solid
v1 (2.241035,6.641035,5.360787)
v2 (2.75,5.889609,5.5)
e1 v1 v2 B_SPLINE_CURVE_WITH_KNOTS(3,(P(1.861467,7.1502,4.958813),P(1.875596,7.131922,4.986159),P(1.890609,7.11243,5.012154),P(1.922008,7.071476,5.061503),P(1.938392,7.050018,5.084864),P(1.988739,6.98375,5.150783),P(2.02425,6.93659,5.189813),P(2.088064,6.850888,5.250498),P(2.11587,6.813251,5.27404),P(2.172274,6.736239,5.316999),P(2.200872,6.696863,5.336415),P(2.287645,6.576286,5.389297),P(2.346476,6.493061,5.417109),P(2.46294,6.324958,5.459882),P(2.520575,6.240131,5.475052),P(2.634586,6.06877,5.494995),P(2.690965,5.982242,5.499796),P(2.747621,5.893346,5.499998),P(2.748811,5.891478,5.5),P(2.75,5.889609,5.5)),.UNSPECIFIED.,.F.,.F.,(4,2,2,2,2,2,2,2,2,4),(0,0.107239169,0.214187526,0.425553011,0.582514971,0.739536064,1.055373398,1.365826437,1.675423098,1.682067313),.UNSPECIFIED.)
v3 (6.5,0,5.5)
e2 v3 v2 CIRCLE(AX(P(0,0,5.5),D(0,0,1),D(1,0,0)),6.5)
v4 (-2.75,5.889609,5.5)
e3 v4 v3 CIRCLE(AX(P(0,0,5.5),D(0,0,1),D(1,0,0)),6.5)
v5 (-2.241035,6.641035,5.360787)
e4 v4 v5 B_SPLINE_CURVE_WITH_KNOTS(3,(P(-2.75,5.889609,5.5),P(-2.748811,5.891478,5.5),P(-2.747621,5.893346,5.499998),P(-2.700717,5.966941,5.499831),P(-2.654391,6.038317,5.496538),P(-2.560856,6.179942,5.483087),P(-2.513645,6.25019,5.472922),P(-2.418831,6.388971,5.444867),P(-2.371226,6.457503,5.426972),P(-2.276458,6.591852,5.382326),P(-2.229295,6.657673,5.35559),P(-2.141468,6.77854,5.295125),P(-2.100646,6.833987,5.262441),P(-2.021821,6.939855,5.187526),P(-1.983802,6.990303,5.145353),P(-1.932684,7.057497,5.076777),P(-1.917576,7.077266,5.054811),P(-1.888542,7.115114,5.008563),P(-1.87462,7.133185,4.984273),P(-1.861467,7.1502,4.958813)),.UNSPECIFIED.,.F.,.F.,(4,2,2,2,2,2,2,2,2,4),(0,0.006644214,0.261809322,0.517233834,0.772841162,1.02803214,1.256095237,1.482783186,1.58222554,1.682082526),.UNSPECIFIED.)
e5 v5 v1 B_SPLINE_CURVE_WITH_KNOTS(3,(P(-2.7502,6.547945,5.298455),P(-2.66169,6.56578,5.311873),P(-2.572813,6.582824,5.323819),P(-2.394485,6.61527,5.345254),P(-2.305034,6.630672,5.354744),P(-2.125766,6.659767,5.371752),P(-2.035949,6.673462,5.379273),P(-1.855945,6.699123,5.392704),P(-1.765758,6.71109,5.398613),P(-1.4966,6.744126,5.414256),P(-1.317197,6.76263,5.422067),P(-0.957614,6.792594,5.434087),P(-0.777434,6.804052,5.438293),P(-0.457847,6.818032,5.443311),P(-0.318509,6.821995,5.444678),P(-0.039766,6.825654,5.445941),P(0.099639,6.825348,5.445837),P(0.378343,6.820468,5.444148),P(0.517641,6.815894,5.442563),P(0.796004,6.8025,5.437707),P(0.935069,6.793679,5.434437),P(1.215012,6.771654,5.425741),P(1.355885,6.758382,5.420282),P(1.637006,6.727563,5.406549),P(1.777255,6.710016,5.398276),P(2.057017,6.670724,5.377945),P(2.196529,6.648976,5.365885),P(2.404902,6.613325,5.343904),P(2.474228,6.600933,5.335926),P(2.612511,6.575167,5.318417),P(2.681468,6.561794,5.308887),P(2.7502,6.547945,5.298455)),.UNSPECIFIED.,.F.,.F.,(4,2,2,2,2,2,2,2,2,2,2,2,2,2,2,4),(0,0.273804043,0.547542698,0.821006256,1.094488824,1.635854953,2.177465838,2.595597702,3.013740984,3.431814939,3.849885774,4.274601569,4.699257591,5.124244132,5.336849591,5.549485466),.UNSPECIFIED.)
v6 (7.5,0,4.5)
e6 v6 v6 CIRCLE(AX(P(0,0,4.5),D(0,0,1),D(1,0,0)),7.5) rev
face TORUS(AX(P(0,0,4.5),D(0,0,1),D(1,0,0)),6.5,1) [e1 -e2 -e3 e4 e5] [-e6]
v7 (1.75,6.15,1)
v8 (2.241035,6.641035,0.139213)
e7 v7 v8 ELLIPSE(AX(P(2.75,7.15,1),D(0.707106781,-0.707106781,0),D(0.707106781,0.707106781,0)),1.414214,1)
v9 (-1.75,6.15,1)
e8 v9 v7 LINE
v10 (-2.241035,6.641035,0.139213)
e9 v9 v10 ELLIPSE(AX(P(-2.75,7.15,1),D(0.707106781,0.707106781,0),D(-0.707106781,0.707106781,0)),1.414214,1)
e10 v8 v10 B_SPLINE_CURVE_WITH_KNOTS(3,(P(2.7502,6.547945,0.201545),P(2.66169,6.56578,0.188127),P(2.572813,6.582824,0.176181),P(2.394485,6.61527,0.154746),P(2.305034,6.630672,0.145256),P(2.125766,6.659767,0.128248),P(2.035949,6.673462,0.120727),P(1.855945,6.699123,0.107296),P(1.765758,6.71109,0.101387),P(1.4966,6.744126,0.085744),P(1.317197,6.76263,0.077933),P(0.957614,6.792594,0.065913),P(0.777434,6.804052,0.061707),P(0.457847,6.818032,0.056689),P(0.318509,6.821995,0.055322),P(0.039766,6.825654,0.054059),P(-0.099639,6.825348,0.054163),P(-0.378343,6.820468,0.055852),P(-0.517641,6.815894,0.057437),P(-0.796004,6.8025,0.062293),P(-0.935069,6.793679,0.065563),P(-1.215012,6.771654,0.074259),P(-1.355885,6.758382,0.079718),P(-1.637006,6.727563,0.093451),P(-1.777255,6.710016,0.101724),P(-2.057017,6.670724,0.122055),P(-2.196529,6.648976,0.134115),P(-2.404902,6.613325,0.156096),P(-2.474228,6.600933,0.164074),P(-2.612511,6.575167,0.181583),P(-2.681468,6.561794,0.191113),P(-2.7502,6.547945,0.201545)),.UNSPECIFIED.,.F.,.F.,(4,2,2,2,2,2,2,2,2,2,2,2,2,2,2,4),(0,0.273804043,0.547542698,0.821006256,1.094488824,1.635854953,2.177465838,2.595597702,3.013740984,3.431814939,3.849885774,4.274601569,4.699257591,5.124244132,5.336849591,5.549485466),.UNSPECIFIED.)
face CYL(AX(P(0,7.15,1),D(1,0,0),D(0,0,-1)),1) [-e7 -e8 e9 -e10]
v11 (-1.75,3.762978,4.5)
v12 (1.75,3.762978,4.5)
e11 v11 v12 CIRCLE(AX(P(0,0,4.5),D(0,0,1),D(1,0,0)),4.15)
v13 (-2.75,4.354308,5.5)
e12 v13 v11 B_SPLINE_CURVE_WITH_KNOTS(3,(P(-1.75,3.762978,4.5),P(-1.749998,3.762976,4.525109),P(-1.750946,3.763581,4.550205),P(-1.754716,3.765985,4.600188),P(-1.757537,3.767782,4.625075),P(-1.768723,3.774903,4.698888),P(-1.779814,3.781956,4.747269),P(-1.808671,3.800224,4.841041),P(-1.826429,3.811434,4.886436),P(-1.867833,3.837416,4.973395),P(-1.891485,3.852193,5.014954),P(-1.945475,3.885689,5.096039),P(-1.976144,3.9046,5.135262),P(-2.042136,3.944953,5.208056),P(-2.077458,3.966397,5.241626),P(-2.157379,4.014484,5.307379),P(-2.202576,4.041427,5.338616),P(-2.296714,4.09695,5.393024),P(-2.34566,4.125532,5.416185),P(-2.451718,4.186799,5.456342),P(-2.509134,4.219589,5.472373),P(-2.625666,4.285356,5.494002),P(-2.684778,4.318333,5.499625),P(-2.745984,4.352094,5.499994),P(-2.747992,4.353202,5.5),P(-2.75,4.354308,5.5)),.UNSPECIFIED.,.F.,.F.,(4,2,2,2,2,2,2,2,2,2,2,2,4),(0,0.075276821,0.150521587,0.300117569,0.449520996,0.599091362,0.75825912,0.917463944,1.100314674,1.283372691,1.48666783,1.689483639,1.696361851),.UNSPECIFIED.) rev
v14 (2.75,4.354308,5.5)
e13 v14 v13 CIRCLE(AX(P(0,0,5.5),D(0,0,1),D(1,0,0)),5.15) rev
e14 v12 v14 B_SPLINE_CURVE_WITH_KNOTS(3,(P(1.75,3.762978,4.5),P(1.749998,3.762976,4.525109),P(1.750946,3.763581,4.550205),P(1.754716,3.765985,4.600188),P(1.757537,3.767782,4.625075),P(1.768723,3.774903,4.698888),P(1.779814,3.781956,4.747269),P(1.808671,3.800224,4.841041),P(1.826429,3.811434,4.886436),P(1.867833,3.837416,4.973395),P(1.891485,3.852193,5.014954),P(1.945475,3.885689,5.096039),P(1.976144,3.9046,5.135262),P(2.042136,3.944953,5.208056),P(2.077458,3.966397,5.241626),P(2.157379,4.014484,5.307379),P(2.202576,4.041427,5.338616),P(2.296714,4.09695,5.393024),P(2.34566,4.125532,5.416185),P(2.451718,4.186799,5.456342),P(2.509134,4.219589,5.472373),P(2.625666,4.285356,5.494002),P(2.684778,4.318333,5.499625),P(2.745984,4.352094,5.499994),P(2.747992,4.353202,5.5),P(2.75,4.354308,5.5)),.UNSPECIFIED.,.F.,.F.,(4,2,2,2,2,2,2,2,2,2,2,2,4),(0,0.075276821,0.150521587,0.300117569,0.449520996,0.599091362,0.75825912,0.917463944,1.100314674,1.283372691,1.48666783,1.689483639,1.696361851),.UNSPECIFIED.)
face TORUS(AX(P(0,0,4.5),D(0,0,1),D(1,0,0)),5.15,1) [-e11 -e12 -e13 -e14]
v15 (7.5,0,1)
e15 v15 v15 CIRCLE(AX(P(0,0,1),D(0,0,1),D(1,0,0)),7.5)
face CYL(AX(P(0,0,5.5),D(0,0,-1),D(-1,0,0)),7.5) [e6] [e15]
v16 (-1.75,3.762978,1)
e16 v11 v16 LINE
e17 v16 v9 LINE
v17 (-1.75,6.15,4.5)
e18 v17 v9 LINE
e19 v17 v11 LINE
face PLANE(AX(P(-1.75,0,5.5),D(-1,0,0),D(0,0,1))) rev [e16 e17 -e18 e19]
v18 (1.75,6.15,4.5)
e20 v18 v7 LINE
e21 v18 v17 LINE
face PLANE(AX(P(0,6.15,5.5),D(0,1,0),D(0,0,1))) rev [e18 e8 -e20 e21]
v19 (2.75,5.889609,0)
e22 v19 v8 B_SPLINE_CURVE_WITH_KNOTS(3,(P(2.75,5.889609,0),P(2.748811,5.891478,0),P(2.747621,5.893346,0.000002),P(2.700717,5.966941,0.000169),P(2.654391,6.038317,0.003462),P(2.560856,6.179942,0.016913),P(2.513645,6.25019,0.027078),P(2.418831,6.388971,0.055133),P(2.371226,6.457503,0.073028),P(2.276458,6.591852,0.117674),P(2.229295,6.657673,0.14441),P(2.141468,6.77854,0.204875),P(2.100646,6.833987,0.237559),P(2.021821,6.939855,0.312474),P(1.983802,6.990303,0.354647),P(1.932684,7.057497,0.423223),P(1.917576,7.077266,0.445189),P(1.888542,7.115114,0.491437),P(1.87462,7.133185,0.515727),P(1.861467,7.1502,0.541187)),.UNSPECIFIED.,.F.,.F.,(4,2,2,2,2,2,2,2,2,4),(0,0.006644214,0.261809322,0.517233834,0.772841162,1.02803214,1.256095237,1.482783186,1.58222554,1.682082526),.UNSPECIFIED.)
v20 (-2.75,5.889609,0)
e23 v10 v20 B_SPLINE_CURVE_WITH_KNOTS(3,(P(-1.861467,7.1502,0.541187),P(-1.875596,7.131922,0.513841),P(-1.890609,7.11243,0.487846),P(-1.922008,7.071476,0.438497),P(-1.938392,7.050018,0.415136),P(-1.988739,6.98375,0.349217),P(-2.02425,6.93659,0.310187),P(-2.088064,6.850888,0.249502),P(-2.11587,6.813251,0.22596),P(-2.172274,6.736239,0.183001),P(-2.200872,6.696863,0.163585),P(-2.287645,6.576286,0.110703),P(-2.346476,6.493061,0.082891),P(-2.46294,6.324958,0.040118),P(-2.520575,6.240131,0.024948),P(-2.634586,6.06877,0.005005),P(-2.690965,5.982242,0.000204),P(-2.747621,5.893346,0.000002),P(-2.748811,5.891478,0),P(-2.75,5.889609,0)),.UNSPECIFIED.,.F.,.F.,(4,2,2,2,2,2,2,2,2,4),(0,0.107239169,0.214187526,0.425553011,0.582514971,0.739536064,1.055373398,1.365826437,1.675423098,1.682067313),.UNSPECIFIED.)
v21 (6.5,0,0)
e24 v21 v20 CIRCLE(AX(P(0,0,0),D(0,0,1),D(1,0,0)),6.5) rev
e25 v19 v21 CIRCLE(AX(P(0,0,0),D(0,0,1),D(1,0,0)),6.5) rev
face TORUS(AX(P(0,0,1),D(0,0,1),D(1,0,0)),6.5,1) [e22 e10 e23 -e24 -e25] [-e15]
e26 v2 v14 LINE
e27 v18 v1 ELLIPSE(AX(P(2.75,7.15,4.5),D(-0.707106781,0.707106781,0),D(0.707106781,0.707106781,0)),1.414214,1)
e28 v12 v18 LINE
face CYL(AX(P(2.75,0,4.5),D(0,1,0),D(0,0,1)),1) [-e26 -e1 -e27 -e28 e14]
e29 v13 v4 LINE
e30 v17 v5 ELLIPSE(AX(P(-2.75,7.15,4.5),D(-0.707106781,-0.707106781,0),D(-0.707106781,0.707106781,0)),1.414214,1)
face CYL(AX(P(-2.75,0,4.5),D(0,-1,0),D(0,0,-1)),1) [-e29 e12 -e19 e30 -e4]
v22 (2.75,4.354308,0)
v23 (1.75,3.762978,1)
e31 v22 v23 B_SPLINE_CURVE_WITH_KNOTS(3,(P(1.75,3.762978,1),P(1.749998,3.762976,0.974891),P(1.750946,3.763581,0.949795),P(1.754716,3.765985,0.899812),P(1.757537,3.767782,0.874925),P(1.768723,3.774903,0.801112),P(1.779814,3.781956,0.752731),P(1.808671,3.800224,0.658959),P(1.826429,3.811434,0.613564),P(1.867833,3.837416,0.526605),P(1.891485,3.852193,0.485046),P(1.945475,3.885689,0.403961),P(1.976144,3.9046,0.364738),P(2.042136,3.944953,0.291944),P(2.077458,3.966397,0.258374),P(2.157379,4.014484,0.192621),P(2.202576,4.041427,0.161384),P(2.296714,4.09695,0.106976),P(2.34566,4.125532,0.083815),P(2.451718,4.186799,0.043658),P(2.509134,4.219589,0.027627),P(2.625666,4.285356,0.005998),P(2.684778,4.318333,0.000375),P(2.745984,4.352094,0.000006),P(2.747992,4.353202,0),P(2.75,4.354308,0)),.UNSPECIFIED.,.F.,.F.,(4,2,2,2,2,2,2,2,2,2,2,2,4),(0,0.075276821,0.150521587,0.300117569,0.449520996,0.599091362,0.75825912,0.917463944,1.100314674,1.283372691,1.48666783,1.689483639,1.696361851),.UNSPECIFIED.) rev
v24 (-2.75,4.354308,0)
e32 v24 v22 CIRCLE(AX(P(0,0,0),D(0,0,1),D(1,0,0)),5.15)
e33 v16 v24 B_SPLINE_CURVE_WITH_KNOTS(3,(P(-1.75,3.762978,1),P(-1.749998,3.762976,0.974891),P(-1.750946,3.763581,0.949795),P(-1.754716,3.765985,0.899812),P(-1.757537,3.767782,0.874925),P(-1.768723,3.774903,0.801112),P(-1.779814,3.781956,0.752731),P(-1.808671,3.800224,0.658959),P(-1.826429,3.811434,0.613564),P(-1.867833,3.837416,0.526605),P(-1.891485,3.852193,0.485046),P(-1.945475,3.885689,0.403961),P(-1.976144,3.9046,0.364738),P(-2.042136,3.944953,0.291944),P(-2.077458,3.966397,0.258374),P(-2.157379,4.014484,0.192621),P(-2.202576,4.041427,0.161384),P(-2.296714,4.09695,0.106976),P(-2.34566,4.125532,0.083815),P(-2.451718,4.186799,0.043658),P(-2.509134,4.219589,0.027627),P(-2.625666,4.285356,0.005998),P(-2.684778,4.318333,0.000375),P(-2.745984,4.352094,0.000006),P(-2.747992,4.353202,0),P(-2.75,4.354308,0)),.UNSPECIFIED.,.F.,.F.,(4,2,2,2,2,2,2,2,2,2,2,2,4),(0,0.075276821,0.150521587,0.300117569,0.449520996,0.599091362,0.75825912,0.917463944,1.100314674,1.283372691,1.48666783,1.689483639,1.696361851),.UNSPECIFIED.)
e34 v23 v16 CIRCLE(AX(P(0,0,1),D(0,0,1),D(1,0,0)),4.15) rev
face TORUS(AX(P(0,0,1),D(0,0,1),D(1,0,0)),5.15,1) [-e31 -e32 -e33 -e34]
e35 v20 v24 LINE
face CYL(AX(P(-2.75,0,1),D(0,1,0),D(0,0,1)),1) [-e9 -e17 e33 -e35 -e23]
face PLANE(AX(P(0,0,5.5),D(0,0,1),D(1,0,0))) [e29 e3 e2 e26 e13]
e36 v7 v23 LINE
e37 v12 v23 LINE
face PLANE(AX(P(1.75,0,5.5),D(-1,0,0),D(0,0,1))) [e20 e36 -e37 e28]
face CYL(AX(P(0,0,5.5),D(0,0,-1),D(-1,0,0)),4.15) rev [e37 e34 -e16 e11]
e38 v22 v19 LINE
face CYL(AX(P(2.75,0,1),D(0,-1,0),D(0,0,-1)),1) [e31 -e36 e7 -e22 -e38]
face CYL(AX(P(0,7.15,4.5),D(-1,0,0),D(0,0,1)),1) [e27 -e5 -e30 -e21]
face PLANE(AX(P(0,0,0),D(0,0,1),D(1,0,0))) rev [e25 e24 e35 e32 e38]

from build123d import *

# Parameters (mm, degrees)
SKIZZE1_R                       = 7.5
AUFSATZ_LINEAR_AUSTRAGEN1_DEPTH = 5.5
VERRUNDUNG1_R                   = 1


with BuildPart() as part:
    # Skizze1 → Aufsatz-Linear austragen1 (new body)
    with BuildSketch(Plane.XY):
        Circle(SKIZZE1_R)
        with BuildLine():
            ThreePointArc((4.15, -1.02e-15), (-2.2315913604421826, -3.498928407384154), (-1.749999999999914, 3.762977544445396))
            Line((-1.75, 3.762977544445424), (-1.75, 6.15))
            Line((-1.75, 6.150000000000001), (1.75, 6.150000000000001))
            Line((1.75, 6.15), (1.75, 3.7629775444453486))
            ThreePointArc((1.7500000000000098, 3.7629775444453517), (3.498928407384184, 2.2315913604421356), (4.15, 0))
        make_face(mode=Mode.SUBTRACT)
    extrude(amount=AUFSATZ_LINEAR_AUSTRAGEN1_DEPTH)

    # Verrundung1
    # the kernel refuses this fillet: 1 mm, written as the material it takes off along each edge
    with BuildSketch(Plane(origin=(-1.75, 1.2629775444454236, 5.5), x_dir=(-1, 0, 0), z_dir=(0, 1, 0))) as verrundung1_piece_1:
        with BuildLine():
            CenterArc((VERRUNDUNG1_R, -VERRUNDUNG1_R), VERRUNDUNG1_R, 90, 90)
            Line((0, -VERRUNDUNG1_R), (0, 0))
            Line((0, 0), (VERRUNDUNG1_R, 0))
        make_face()
    extrude(amount=4.887022455554577, mode=Mode.SUBTRACT)
    with BuildSketch(Plane(origin=(-1.75, 6.150000000000001, 5.5), x_dir=(0, 1, 0), z_dir=(1, 0, 0))) as verrundung1_piece_2:
        with BuildLine():
            CenterArc((VERRUNDUNG1_R, -VERRUNDUNG1_R), VERRUNDUNG1_R, 90, 90)
            Line((0, -VERRUNDUNG1_R), (0, 0))
            Line((0, 0), (VERRUNDUNG1_R, 0))
        make_face()
    extrude(amount=3.5, mode=Mode.SUBTRACT)
    with BuildSketch(Plane(origin=(1.75, 6.15, 5.5), x_dir=(1, 0, 0), z_dir=(0, -1, 0))) as verrundung1_piece_3:
        with BuildLine():
            CenterArc((VERRUNDUNG1_R, -VERRUNDUNG1_R), VERRUNDUNG1_R, 90, 90)
            Line((0, -VERRUNDUNG1_R), (0, 0))
            Line((0, 0), (VERRUNDUNG1_R, 0))
        make_face()
    extrude(amount=4.887022455554652, mode=Mode.SUBTRACT)
    with BuildSketch(Plane(origin=(0, 0, 5.5), x_dir=(1, 0, 0), z_dir=(0, -1, 0))) as verrundung1_piece_4:
        with BuildLine():
            CenterArc((7.5 - VERRUNDUNG1_R, -VERRUNDUNG1_R), VERRUNDUNG1_R, 0, 90)
            Line((7.5 - VERRUNDUNG1_R, 0), (7.5, 0))
            Line((7.5, 0), (7.5, -VERRUNDUNG1_R))
        make_face()
    revolve(axis=Axis((0, 0, 5.5), (0, 0, 1)), mode=Mode.SUBTRACT)
    with BuildSketch(Plane(origin=(-6e-17, 3.3e-16, 5.5), x_dir=(-0.0031415874858718097, 0.9999950652018581, 0), z_dir=(0.9999950652018581, 0.0031415874858718097, 0))) as verrundung1_piece_5:
        with BuildLine():
            CenterArc((4.1499999999999995 + VERRUNDUNG1_R, -VERRUNDUNG1_R), VERRUNDUNG1_R, 90, 90)
            Line((4.1499999999999995, -VERRUNDUNG1_R), (4.1499999999999995, 0))
            Line((4.1499999999999995, 0), (4.1499999999999995 + VERRUNDUNG1_R, 0))
        make_face()
    revolve(axis=Axis((-6e-17, 3.3e-16, 5.5), (0, 0, 1)), revolution_arc=359.64, mode=Mode.SUBTRACT)
    with BuildSketch(Plane(origin=(0, 0, 0), x_dir=(1, 0, 0), z_dir=(0, -1, 0))) as verrundung1_piece_6:
        with BuildLine():
            CenterArc((7.5 - VERRUNDUNG1_R, VERRUNDUNG1_R), VERRUNDUNG1_R, 270, 90)
            Line((7.5 - VERRUNDUNG1_R, -1.1e-16), (7.5, 0))
            Line((7.5, 0), (7.5, VERRUNDUNG1_R))
        make_face()
    revolve(axis=Axis((0, 0, 0), (0, 0, 1)), mode=Mode.SUBTRACT)
    with BuildSketch(Plane(origin=(1.75, 6.15, 0), x_dir=(0, 0, 1), z_dir=(0, -1, 0))) as verrundung1_piece_7:
        with BuildLine():
            CenterArc((VERRUNDUNG1_R, -VERRUNDUNG1_R), VERRUNDUNG1_R, 90, 90)
            Line((-1.1e-16, -VERRUNDUNG1_R), (0, 0))
            Line((0, 0), (VERRUNDUNG1_R, 0))
        make_face()
    extrude(amount=4.887022455554652, mode=Mode.SUBTRACT)
    with BuildSketch(Plane(origin=(-1.75, 6.150000000000001, 0), x_dir=(0, 0, 1), z_dir=(1, 0, 0))) as verrundung1_piece_8:
        with BuildLine():
            CenterArc((VERRUNDUNG1_R, -VERRUNDUNG1_R), VERRUNDUNG1_R, 90, 90)
            Line((-1.1e-16, -VERRUNDUNG1_R), (0, 0))
            Line((0, 0), (VERRUNDUNG1_R, 0))
        make_face()
    extrude(amount=3.5, mode=Mode.SUBTRACT)
    with BuildSketch(Plane(origin=(-1.75, 1.2629775444454236, 0), x_dir=(0, 0, 1), z_dir=(0, 1, 0))) as verrundung1_piece_9:
        with BuildLine():
            CenterArc((VERRUNDUNG1_R, -VERRUNDUNG1_R), VERRUNDUNG1_R, 90, 90)
            Line((-1.1e-16, -VERRUNDUNG1_R), (0, 0))
            Line((0, 0), (VERRUNDUNG1_R, 0))
        make_face()
    extrude(amount=4.887022455554577, mode=Mode.SUBTRACT)
    with BuildSketch(Plane(origin=(1.55e-15, 1e-15, 0), x_dir=(0.0031415874858877553, 0.9999950652018581, 0), z_dir=(-0.9999950652018581, 0.0031415874858877553, 0))) as verrundung1_piece_10:
        with BuildLine():
            CenterArc((4.149999999999999 + VERRUNDUNG1_R, -VERRUNDUNG1_R), VERRUNDUNG1_R, 90, 90)
            Line((4.149999999999999 + VERRUNDUNG1_R, 1.1e-16), (4.149999999999999, 0))
            Line((4.149999999999999, 0), (4.149999999999999, -VERRUNDUNG1_R))
        make_face()
    revolve(axis=Axis((1.55e-15, 1e-15, 0), (0, 0, -1)), revolution_arc=359.64, mode=Mode.SUBTRACT)
    with BuildSketch(Plane(origin=(-1.75, 1.2629775444454236, 5.5), x_dir=(-1, 0, 0), z_dir=(0, 1, 0))) as verrundung1_piece_11a_section:
        with BuildLine():
            CenterArc((VERRUNDUNG1_R, -VERRUNDUNG1_R), VERRUNDUNG1_R, 90, 90)
            Line((0, -VERRUNDUNG1_R), (0, 0))
            Line((0, 0), (VERRUNDUNG1_R, 0))
        make_face()
    verrundung1_piece_11a = extrude(amount=7.387022455554577, mode=Mode.PRIVATE)
    verrundung1_piece_11a = verrundung1_piece_11a & Plane(origin=(0, 0, 5.5), x_dir=(1, 0, 0), z_dir=(0, 0, -1)) * Cylinder(7.5, 19, mode=Mode.PRIVATE)
    verrundung1_piece_11a = split(verrundung1_piece_11a, bisect_by=Plane(origin=(-1.75, 6.15, 5.5), z_dir=(0, 1, 0)), keep=Keep.TOP, mode=Mode.PRIVATE)
    with BuildSketch(Plane(origin=(-4.25, 6.150000000000001, 5.5), x_dir=(0, 1, 0), z_dir=(1, 0, 0))) as verrundung1_piece_11b_section:
        with BuildLine():
            CenterArc((VERRUNDUNG1_R, -VERRUNDUNG1_R), VERRUNDUNG1_R, 90, 90)
            Line((0, -VERRUNDUNG1_R), (0, 0))
            Line((0, 0), (VERRUNDUNG1_R, 0))
        make_face()
    verrundung1_piece_11b = extrude(amount=6, mode=Mode.PRIVATE)
    verrundung1_piece_11b = verrundung1_piece_11b & Plane(origin=(0, 0, 5.5), x_dir=(1, 0, 0), z_dir=(0, 0, -1)) * Cylinder(7.5, 16, mode=Mode.PRIVATE)
    verrundung1_piece_11b = split(verrundung1_piece_11b, bisect_by=Plane(origin=(-1.75, 6.150000000000001, 5.5), z_dir=(-1, 0, 0)), keep=Keep.TOP, mode=Mode.PRIVATE)
    verrundung1_piece_11 = verrundung1_piece_11a & verrundung1_piece_11b
    add(verrundung1_piece_11, mode=Mode.SUBTRACT)
    with BuildSketch(Plane(origin=(-1.75, 6.150000000000001, 5.5), x_dir=(0, 1, 0), z_dir=(1, 0, 0))) as verrundung1_piece_12a_section:
        with BuildLine():
            CenterArc((VERRUNDUNG1_R, -VERRUNDUNG1_R), VERRUNDUNG1_R, 90, 90)
            Line((0, -VERRUNDUNG1_R), (0, 0))
            Line((0, 0), (VERRUNDUNG1_R, 0))
        make_face()
    verrundung1_piece_12a = extrude(amount=6, mode=Mode.PRIVATE)
    verrundung1_piece_12a = verrundung1_piece_12a & Plane(origin=(0, 0, 5.5), x_dir=(1, 0, 0), z_dir=(0, 0, -1)) * Cylinder(7.5, 16, mode=Mode.PRIVATE)
    verrundung1_piece_12a = split(verrundung1_piece_12a, bisect_by=Plane(origin=(1.75, 6.150000000000001, 5.5), z_dir=(1, 0, 0)), keep=Keep.TOP, mode=Mode.PRIVATE)
    with BuildSketch(Plane(origin=(1.75, 8.65, 5.5), x_dir=(1, 0, 0), z_dir=(0, -1, 0))) as verrundung1_piece_12b_section:
        with BuildLine():
            CenterArc((VERRUNDUNG1_R, -VERRUNDUNG1_R), VERRUNDUNG1_R, 90, 90)
            Line((0, -VERRUNDUNG1_R), (0, 0))
            Line((0, 0), (VERRUNDUNG1_R, 0))
        make_face()
    verrundung1_piece_12b = extrude(amount=7.387022455554652, mode=Mode.PRIVATE)
    verrundung1_piece_12b = verrundung1_piece_12b & Plane(origin=(0, 0, 5.5), x_dir=(1, 0, 0), z_dir=(0, 0, -1)) * Cylinder(7.5, 19, mode=Mode.PRIVATE)
    verrundung1_piece_12b = split(verrundung1_piece_12b, bisect_by=Plane(origin=(1.75, 6.150000000000001, 5.5), z_dir=(0, 1, 0)), keep=Keep.TOP, mode=Mode.PRIVATE)
    verrundung1_piece_12 = verrundung1_piece_12a & verrundung1_piece_12b
    add(verrundung1_piece_12, mode=Mode.SUBTRACT)
    with BuildSketch(Plane(origin=(1.75, 8.65, 0), x_dir=(0, 0, 1), z_dir=(0, -1, 0))) as verrundung1_piece_13a_section:
        with BuildLine():
            CenterArc((VERRUNDUNG1_R, -VERRUNDUNG1_R), VERRUNDUNG1_R, 90, 90)
            Line((-1.1e-16, -VERRUNDUNG1_R), (0, 0))
            Line((0, 0), (VERRUNDUNG1_R, 0))
        make_face()
    verrundung1_piece_13a = extrude(amount=7.387022455554652, mode=Mode.PRIVATE)
    verrundung1_piece_13a = verrundung1_piece_13a & Plane(origin=(0, 0, 0), x_dir=(1, 0, 0), z_dir=(0, 0, -1)) * Cylinder(7.5, 19, mode=Mode.PRIVATE)
    verrundung1_piece_13a = split(verrundung1_piece_13a, bisect_by=Plane(origin=(1.75, 6.150000000000001, 0), z_dir=(0, 1, 0)), keep=Keep.TOP, mode=Mode.PRIVATE)
    with BuildSketch(Plane(origin=(-1.75, 6.150000000000001, 0), x_dir=(0, 0, 1), z_dir=(1, 0, 0))) as verrundung1_piece_13b_section:
        with BuildLine():
            CenterArc((VERRUNDUNG1_R, -VERRUNDUNG1_R), VERRUNDUNG1_R, 90, 90)
            Line((-1.1e-16, -VERRUNDUNG1_R), (0, 0))
            Line((0, 0), (VERRUNDUNG1_R, 0))
        make_face()
    verrundung1_piece_13b = extrude(amount=6, mode=Mode.PRIVATE)
    verrundung1_piece_13b = verrundung1_piece_13b & Plane(origin=(0, 0, 0), x_dir=(1, 0, 0), z_dir=(0, 0, -1)) * Cylinder(7.5, 16, mode=Mode.PRIVATE)
    verrundung1_piece_13b = split(verrundung1_piece_13b, bisect_by=Plane(origin=(1.75, 6.150000000000001, 0), z_dir=(1, 0, 0)), keep=Keep.TOP, mode=Mode.PRIVATE)
    verrundung1_piece_13 = verrundung1_piece_13a & verrundung1_piece_13b
    add(verrundung1_piece_13, mode=Mode.SUBTRACT)
    with BuildSketch(Plane(origin=(-4.25, 6.150000000000001, 0), x_dir=(0, 0, 1), z_dir=(1, 0, 0))) as verrundung1_piece_14a_section:
        with BuildLine():
            CenterArc((VERRUNDUNG1_R, -VERRUNDUNG1_R), VERRUNDUNG1_R, 90, 90)
            Line((-1.1e-16, -VERRUNDUNG1_R), (0, 0))
            Line((0, 0), (VERRUNDUNG1_R, 0))
        make_face()
    verrundung1_piece_14a = extrude(amount=6, mode=Mode.PRIVATE)
    verrundung1_piece_14a = verrundung1_piece_14a & Plane(origin=(0, 0, 0), x_dir=(1, 0, 0), z_dir=(0, 0, -1)) * Cylinder(7.5, 16, mode=Mode.PRIVATE)
    verrundung1_piece_14a = split(verrundung1_piece_14a, bisect_by=Plane(origin=(-1.75, 6.150000000000001, 0), z_dir=(-1, 0, 0)), keep=Keep.TOP, mode=Mode.PRIVATE)
    with BuildSketch(Plane(origin=(-1.75, 1.2629775444454236, 0), x_dir=(0, 0, 1), z_dir=(0, 1, 0))) as verrundung1_piece_14b_section:
        with BuildLine():
            CenterArc((VERRUNDUNG1_R, -VERRUNDUNG1_R), VERRUNDUNG1_R, 90, 90)
            Line((-1.1e-16, -VERRUNDUNG1_R), (0, 0))
            Line((0, 0), (VERRUNDUNG1_R, 0))
        make_face()
    verrundung1_piece_14b = extrude(amount=7.387022455554577, mode=Mode.PRIVATE)
    verrundung1_piece_14b = verrundung1_piece_14b & Plane(origin=(0, 0, 0), x_dir=(1, 0, 0), z_dir=(0, 0, -1)) * Cylinder(7.5, 19, mode=Mode.PRIVATE)
    verrundung1_piece_14b = split(verrundung1_piece_14b, bisect_by=Plane(origin=(-1.75, 6.15, 0), z_dir=(0, 1, 0)), keep=Keep.TOP, mode=Mode.PRIVATE)
    verrundung1_piece_14 = verrundung1_piece_14a & verrundung1_piece_14b
    add(verrundung1_piece_14, mode=Mode.SUBTRACT)


solid = part.part
